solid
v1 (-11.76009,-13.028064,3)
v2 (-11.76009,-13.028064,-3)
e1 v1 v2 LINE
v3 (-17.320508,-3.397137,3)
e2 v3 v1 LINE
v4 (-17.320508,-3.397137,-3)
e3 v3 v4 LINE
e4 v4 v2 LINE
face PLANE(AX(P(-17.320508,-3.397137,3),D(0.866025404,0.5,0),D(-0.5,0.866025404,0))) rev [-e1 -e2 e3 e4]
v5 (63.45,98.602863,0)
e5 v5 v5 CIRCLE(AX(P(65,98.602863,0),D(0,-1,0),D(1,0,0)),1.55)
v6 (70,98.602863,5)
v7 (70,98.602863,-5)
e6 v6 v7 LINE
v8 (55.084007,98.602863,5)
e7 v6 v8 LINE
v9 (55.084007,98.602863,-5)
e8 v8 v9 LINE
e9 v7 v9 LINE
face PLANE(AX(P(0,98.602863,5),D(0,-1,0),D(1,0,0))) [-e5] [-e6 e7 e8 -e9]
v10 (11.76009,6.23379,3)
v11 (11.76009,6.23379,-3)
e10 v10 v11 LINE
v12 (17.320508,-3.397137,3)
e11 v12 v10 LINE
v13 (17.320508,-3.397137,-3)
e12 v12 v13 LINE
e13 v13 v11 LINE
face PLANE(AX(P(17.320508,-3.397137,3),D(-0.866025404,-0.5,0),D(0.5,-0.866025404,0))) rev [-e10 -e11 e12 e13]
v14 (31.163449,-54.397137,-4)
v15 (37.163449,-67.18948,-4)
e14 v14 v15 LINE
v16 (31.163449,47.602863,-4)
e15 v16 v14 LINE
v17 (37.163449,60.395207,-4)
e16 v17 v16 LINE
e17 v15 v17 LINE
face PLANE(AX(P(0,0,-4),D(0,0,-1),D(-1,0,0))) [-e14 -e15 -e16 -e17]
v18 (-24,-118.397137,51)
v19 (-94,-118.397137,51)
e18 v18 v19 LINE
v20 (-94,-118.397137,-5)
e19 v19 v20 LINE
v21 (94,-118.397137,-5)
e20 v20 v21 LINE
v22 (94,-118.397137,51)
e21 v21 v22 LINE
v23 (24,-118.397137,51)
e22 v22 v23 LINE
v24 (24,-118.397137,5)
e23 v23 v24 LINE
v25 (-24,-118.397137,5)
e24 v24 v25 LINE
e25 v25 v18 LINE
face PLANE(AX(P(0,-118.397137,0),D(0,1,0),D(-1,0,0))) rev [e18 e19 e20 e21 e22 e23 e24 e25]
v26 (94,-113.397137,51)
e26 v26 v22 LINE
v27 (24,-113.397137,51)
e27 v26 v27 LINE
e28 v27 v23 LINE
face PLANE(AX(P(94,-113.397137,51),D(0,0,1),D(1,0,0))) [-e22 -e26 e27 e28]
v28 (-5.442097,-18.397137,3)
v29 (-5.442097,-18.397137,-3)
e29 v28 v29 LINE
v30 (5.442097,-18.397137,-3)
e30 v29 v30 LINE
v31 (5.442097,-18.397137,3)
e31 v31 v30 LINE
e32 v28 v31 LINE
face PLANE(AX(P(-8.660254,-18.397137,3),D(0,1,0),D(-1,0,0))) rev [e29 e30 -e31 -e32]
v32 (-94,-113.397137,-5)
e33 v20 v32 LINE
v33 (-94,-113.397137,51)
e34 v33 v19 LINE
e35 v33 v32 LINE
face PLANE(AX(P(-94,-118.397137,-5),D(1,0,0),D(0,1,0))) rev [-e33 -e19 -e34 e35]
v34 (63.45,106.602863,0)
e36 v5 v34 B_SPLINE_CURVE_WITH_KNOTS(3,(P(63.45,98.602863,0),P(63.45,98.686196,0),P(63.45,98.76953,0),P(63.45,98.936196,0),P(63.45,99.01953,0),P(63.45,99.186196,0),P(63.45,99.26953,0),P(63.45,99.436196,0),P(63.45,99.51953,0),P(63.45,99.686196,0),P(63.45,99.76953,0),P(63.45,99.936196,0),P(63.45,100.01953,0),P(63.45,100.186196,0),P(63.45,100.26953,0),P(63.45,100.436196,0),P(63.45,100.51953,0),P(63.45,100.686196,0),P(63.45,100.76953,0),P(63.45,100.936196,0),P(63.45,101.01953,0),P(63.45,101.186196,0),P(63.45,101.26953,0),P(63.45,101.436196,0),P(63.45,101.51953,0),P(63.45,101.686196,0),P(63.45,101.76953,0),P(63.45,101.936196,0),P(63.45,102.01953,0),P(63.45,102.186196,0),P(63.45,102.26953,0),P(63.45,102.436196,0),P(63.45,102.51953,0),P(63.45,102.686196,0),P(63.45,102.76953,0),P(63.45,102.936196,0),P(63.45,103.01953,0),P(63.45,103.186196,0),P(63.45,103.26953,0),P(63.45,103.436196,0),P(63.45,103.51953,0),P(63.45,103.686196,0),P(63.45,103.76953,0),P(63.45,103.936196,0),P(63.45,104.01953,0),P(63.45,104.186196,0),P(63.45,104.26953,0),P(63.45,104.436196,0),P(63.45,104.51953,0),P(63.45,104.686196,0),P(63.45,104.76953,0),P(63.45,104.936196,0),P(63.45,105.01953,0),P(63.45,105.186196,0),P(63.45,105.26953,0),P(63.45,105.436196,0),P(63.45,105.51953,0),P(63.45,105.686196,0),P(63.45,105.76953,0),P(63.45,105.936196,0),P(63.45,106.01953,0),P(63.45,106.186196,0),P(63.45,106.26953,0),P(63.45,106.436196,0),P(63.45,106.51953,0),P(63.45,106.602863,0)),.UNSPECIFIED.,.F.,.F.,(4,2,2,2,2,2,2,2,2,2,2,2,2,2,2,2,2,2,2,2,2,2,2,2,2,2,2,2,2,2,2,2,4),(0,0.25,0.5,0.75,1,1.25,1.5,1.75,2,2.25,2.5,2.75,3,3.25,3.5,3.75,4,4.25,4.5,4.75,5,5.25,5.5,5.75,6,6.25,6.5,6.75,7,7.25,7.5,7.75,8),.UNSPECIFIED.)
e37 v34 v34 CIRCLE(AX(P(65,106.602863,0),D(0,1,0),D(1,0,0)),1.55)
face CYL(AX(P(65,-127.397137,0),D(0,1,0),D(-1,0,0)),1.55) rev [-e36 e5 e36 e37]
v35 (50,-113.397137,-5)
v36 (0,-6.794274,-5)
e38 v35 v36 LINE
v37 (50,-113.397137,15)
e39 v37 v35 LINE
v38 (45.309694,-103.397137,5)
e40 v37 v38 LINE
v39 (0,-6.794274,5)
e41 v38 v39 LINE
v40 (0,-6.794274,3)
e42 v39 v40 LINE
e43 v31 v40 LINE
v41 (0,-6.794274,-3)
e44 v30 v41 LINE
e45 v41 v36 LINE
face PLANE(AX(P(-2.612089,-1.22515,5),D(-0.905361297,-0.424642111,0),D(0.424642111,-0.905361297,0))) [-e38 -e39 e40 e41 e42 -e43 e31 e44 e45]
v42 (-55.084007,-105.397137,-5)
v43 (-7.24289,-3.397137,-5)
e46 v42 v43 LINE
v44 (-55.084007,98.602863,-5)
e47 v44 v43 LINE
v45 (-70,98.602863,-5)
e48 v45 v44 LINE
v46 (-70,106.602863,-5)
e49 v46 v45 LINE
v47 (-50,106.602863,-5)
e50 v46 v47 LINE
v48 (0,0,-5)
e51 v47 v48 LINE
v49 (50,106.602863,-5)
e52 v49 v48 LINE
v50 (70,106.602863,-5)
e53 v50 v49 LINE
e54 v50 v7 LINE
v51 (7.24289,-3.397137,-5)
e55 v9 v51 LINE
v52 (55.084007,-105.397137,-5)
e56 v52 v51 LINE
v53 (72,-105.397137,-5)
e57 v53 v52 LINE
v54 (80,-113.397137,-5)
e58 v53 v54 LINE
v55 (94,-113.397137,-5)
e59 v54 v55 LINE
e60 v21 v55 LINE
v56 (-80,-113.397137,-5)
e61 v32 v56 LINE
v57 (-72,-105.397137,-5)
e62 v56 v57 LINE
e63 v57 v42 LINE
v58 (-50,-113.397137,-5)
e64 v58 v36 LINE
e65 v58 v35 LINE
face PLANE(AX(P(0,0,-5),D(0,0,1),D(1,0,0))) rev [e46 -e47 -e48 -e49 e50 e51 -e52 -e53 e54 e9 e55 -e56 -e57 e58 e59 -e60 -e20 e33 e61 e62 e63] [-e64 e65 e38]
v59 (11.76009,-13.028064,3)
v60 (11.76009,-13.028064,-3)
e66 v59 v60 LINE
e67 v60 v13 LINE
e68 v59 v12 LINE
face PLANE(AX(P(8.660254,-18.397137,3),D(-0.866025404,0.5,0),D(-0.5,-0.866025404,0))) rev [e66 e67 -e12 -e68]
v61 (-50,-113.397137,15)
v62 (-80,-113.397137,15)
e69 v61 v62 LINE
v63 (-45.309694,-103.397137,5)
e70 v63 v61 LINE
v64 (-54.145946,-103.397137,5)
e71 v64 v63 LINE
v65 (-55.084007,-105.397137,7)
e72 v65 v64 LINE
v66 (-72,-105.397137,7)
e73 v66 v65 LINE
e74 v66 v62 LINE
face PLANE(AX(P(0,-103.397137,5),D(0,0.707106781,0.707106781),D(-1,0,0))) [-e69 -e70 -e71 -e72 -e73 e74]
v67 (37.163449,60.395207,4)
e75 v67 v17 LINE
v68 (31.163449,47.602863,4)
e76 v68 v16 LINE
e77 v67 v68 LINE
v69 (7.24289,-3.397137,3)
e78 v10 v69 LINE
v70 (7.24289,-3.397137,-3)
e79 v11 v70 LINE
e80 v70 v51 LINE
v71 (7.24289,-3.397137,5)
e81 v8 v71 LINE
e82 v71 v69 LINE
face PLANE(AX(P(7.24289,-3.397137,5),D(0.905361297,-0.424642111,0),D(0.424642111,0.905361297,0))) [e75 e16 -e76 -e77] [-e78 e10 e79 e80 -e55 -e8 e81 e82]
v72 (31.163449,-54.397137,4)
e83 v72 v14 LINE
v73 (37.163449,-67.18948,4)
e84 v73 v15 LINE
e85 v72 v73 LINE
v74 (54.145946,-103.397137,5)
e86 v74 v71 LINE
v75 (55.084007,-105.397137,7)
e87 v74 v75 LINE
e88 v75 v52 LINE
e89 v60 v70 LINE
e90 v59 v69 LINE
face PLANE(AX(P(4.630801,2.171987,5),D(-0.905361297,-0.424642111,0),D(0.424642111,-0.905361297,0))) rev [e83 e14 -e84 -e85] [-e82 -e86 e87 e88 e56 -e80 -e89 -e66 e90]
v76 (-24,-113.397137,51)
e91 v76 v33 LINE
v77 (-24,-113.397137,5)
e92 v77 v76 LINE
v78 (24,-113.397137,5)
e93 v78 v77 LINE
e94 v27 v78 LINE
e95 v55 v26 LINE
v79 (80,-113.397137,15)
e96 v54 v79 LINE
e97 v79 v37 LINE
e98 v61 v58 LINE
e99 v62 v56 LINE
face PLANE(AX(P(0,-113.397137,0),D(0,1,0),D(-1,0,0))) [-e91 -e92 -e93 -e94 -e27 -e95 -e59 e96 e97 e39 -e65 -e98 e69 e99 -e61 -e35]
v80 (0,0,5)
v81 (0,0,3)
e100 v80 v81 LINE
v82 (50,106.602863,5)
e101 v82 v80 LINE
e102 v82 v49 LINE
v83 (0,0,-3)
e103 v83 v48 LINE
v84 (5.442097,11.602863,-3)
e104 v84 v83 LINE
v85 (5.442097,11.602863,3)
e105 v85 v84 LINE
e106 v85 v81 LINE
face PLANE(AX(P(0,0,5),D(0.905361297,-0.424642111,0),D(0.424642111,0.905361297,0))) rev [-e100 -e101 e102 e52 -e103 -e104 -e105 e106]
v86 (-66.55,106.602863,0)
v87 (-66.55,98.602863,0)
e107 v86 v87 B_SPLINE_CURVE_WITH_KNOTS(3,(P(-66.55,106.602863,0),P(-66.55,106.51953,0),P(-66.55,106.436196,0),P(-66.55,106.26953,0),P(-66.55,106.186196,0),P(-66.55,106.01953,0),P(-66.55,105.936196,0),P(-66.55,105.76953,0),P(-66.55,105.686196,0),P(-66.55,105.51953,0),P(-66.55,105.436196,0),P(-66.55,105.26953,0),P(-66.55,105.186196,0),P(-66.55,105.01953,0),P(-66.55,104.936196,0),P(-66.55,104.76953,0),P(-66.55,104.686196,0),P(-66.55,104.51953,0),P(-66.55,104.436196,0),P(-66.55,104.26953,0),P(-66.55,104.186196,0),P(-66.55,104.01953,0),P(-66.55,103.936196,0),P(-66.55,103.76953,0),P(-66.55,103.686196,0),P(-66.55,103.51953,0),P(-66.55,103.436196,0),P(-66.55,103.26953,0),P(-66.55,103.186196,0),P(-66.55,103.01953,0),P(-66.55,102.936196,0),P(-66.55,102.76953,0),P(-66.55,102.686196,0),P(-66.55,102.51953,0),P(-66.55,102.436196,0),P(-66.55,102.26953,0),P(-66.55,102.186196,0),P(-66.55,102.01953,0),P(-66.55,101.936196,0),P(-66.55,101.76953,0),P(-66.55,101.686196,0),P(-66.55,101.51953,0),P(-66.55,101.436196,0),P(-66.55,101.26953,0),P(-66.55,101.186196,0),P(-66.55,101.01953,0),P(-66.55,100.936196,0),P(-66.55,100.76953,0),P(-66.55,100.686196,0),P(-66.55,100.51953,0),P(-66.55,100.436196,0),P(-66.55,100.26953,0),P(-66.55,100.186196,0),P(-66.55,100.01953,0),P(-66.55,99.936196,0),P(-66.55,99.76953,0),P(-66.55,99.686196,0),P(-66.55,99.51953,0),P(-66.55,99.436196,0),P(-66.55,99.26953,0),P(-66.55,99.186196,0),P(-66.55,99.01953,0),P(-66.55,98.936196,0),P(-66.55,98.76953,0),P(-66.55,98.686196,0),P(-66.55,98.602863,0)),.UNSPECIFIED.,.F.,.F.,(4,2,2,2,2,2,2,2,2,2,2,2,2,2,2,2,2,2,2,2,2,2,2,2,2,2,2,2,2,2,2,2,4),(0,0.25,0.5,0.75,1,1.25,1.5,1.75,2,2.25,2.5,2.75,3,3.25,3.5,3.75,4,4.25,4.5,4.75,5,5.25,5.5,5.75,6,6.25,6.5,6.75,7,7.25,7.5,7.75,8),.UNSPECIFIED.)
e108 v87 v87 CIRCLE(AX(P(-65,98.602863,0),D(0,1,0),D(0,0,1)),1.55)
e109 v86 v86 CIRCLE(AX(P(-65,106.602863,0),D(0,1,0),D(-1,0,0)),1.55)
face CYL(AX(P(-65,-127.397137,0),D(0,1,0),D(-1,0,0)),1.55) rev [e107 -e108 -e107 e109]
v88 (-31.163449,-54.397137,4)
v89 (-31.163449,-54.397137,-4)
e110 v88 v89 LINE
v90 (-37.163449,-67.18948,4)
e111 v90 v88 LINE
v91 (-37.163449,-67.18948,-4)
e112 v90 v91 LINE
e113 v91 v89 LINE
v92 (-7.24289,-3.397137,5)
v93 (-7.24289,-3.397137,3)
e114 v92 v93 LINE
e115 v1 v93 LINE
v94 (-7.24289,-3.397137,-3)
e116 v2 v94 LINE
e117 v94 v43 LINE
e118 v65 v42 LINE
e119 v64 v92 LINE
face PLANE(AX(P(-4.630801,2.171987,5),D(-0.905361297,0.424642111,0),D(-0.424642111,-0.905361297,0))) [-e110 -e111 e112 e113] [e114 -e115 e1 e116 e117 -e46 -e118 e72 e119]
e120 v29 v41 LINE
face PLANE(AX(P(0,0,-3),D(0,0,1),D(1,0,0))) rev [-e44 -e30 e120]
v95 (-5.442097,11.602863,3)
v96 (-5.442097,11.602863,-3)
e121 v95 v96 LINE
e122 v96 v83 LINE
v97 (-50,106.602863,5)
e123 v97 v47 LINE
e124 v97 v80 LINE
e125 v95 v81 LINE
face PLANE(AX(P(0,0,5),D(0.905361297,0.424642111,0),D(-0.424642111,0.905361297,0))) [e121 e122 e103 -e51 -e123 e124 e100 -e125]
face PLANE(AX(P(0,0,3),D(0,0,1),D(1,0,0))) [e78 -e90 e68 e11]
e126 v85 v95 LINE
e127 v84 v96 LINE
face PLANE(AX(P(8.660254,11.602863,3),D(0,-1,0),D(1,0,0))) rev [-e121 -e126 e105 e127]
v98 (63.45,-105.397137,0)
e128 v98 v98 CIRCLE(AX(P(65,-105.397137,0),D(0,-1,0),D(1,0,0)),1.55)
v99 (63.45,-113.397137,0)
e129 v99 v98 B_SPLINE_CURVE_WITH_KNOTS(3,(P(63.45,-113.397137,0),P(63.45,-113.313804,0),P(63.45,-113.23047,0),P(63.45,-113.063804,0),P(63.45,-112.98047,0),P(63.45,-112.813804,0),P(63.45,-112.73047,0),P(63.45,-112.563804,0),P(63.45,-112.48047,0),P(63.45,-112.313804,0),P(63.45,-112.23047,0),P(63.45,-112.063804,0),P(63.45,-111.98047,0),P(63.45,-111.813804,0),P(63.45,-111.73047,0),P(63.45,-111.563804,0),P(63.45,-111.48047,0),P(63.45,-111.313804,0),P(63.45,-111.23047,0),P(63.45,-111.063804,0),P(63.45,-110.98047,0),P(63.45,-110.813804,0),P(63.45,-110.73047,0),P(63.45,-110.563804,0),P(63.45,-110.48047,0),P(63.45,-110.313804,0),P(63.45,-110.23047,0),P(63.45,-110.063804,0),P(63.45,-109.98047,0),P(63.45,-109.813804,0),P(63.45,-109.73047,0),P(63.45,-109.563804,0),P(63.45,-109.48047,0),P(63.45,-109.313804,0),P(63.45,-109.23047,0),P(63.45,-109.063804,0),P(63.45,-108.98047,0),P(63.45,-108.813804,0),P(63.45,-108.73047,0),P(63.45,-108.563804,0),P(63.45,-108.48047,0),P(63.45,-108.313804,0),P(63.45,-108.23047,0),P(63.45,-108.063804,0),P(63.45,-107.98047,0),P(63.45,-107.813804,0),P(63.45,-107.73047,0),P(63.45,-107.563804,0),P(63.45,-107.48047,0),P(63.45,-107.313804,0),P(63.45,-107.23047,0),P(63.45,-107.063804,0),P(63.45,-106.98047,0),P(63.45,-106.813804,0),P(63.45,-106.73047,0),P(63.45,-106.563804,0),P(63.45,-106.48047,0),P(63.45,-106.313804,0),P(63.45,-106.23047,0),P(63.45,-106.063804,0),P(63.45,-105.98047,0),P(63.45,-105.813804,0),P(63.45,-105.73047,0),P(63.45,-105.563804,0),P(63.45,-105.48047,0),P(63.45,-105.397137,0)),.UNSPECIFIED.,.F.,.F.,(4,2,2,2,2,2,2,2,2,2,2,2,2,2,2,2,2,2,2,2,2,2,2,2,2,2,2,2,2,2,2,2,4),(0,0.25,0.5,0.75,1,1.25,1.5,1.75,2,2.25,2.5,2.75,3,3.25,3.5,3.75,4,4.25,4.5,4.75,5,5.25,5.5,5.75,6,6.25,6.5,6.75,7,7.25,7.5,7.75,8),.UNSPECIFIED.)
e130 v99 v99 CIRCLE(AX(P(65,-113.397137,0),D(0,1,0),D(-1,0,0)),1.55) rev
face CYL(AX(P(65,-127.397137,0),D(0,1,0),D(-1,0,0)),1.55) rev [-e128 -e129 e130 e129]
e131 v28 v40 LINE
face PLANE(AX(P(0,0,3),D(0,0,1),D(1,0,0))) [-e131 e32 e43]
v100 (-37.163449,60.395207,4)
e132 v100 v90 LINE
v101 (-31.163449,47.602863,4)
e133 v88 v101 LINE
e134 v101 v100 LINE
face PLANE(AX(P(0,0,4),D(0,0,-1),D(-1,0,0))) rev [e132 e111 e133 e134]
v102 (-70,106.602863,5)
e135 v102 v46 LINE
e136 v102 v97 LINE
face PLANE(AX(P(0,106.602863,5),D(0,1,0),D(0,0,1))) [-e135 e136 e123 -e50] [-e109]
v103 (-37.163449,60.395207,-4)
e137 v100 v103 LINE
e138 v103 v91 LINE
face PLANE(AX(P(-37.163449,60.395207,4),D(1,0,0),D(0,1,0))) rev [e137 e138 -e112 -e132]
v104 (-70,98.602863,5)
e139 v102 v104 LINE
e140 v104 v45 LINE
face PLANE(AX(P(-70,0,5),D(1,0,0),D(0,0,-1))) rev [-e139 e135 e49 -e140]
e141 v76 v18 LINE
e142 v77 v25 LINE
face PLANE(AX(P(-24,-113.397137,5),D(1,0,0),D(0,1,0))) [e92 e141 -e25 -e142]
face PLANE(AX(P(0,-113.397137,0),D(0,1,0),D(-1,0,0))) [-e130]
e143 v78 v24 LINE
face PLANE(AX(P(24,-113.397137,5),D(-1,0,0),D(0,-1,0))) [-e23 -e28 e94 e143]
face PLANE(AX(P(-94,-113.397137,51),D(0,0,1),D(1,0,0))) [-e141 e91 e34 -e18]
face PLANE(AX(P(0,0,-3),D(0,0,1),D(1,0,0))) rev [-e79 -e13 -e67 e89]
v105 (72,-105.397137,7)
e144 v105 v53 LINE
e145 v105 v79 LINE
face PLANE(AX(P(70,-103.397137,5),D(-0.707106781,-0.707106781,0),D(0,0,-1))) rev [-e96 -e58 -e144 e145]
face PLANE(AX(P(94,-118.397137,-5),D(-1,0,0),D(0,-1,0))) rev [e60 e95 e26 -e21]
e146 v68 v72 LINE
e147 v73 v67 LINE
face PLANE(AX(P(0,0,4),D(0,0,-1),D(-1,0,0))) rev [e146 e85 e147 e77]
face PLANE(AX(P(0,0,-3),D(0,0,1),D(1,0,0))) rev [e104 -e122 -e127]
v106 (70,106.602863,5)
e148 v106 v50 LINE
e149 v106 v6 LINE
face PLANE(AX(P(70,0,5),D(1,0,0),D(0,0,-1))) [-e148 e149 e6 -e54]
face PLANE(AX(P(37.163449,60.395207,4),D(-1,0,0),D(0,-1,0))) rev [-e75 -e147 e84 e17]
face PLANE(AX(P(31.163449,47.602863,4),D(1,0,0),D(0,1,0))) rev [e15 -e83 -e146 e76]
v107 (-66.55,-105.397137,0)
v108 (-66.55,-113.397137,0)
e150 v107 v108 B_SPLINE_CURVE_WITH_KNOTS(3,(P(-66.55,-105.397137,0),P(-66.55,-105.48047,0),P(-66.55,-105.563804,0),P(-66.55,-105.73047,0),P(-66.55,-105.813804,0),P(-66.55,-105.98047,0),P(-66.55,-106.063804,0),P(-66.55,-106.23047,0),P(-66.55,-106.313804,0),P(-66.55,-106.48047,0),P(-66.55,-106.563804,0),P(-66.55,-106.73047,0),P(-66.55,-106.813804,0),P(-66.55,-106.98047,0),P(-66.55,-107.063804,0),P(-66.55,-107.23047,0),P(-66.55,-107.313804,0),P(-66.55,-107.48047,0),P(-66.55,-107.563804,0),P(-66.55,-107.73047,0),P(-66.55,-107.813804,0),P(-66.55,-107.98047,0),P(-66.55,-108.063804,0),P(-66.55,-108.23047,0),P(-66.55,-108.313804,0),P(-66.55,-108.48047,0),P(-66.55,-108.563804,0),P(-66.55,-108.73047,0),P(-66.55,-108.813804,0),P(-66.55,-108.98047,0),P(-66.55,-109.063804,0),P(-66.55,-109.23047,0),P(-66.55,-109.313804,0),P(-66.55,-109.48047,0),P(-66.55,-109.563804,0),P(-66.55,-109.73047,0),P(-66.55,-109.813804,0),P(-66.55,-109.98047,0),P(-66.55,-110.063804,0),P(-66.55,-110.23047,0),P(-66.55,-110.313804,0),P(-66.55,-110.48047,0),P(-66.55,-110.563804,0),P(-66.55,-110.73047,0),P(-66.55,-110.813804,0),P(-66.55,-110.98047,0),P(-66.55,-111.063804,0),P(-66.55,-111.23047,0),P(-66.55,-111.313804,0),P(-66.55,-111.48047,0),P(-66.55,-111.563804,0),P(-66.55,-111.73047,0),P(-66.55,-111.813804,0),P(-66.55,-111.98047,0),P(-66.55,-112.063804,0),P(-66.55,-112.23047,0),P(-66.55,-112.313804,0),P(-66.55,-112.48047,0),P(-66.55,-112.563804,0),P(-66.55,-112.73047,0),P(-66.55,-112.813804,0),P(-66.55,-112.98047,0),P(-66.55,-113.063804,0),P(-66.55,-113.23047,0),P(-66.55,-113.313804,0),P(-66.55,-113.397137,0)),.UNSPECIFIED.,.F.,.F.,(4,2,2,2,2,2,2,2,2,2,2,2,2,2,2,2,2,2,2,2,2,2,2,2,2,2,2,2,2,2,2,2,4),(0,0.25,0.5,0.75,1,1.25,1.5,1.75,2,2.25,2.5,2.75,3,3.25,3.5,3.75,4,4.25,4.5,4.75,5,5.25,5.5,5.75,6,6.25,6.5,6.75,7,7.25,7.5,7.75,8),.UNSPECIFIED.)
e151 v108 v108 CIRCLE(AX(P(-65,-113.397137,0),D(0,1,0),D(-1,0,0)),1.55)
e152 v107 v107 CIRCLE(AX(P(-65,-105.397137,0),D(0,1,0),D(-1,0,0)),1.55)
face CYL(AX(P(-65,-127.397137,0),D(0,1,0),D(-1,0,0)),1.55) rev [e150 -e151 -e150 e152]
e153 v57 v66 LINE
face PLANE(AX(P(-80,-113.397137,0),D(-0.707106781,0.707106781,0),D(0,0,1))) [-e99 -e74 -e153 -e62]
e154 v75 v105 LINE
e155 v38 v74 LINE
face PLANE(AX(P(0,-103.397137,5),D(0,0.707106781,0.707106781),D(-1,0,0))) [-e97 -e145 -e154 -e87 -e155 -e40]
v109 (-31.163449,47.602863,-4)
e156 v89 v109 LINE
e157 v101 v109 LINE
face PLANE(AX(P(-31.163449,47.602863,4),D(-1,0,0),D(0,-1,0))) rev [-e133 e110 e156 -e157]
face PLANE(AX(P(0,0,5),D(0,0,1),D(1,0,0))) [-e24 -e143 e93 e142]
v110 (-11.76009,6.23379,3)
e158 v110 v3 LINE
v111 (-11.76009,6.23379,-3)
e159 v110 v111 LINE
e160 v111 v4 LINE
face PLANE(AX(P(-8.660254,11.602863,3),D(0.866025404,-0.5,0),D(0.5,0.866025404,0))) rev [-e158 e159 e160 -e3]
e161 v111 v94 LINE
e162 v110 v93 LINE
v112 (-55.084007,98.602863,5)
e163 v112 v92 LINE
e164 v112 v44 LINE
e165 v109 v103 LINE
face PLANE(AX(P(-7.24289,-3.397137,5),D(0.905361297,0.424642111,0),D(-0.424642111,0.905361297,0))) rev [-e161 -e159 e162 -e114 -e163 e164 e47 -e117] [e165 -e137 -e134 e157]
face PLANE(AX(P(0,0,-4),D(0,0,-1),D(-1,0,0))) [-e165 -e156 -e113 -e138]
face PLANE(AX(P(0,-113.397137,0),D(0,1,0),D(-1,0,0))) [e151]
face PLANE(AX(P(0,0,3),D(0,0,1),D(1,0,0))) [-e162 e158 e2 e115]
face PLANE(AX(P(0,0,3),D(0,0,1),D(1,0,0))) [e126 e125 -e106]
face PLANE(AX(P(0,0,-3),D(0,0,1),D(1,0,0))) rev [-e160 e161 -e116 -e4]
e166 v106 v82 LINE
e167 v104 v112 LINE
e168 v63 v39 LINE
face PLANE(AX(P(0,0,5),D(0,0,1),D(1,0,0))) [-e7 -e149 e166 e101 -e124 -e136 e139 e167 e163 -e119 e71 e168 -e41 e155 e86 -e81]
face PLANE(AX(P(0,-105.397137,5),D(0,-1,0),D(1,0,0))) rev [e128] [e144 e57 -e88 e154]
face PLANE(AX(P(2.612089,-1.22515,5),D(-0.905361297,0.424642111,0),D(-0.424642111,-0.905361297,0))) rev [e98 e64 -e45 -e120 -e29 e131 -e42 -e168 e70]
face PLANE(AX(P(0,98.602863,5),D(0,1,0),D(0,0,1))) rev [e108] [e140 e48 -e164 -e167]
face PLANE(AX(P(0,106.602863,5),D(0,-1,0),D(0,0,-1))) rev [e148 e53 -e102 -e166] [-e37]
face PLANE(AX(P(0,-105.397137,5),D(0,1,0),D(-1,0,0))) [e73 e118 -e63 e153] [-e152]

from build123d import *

# Parameters (mm, degrees)
EXTRUDE_1_DEPTH     = 5
SKETCH_2_R          = 1.55
CUT_EXTRUDE_1_DEPTH = 234
EXTRUDE_3_DEPTH     = 3
SKETCH_4_W          = 188
SKETCH_4_H          = 10
EXTRUDE_4_DEPTH     = 5
SKETCH_5_W          = 70
SKETCH_5_H          = 46
EXTRUDE_5_DEPTH     = 5
EXTRUDE_6_DEPTH     = 4
CHAMFER_1_SIZE      = 10


with BuildPart() as part:
    # 草图1 → 凸台-拉伸1 (new, symmetric)
    with BuildSketch(Plane.XY):
        Polygon((-55.084006936, 98.602863112), (-7.242890373, -3.397136888), (0, 0), (-50, 106.602863112), (-70, 106.602863112), (-70, 98.602863112), align=None)
        Polygon((70, 106.602863112), (70, 98.602863112), (55.084006936, 98.602863112), (7.242890373, -3.397136888), (0, 0), (50, 106.602863112), align=None)
        Polygon((-70, -113.397136888), (-70, -105.397136888), (-55.084006936, -105.397136888), (-7.242890373, -3.397136888), (0, -6.794273777), (-50, -113.397136888), align=None)
        Polygon((55.084006936, -105.397136888), (7.242890373, -3.397136888), (0, -6.794273777), (50, -113.397136888), (70, -113.397136888), (70, -105.397136888), align=None)
        Polygon((-7.242890373, -3.397136888), (0, 0), (7.242890373, -3.397136888), align=None)
        Polygon((-7.242890373, -3.397136888), (7.242890373, -3.397136888), (0, -6.794273777), align=None)
    extrude(amount=EXTRUDE_1_DEPTH, both=True)

    # 草图2 → 切除-拉伸1 (cut)
    with BuildSketch(Plane(origin=(0, 106.602863112, 0), x_dir=(1, 0, 0), z_dir=(0, 1, 0))):
        with Locations(Location((-65, 0, 0), (0, 0, 180))):
            Circle(SKETCH_2_R)
        with Locations(Location((65, 0, 0), (0, 0, 180))):
            Circle(SKETCH_2_R)
    extrude(amount=-CUT_EXTRUDE_1_DEPTH, mode=Mode.SUBTRACT)

    # 草图3 → 凸台-拉伸3 (add, symmetric)
    with BuildSketch(Plane.XY):
        Polygon((8.660254038, 11.602863112), (-8.660254038, 11.602863112), (-17.320508076, -3.397136888), (-8.660254038, -18.397136888), (8.660254038, -18.397136888), (17.320508076, -3.397136888), align=None)
    extrude(amount=EXTRUDE_3_DEPTH, both=True)

    # 草图4 → 凸台-拉伸4 (add)
    with BuildSketch(Plane.XZ.offset(113.397136888)):
        Rectangle(SKETCH_4_W, SKETCH_4_H)
    extrude(amount=EXTRUDE_4_DEPTH)

    # 草图5 → 凸台-拉伸5 (add)
    with BuildSketch(Plane.XZ.offset(118.397136888)):
        with Locations((59, 28)):
            Rectangle(SKETCH_5_W, SKETCH_5_H)
        with Locations((-59, 28)):
            Rectangle(SKETCH_5_W, SKETCH_5_H)
    extrude(amount=-EXTRUDE_5_DEPTH)

    # 草图6 → 凸台-拉伸6 (add, symmetric)
    with BuildSketch(Plane.XY):
        Polygon((-31.163448655, 47.602863112), (-31.163448655, -54.397136888), (-37.163448655, -67.189480462), (-37.163448655, 60.395206685), align=None)
        Polygon((37.163448655, -67.189480462), (31.163448655, -54.397136888), (31.163448655, 47.602863112), (37.163448655, 60.395206685), align=None)
    extrude(amount=EXTRUDE_6_DEPTH, both=True)

    # 倒角1
    # the kernel refuses this chamfer: 10 mm, written as the material it adds along each edge
    with BuildSketch(Plane(origin=(-70, -113.397136888, 5), x_dir=(0, -0.0274958766105877, 0.9996219169112968), z_dir=(1, 0, 0))) as chamfer_1_piece_1_section:
        Polygon((CHAMFER_1_SIZE * 0.999621916911, -CHAMFER_1_SIZE * 0.0274958766106), (-CHAMFER_1_SIZE * 0.0274958766106, -CHAMFER_1_SIZE * 0.999621916911), (0, 0), align=None)
    chamfer_1_piece_1 = extrude(amount=45.71682988, mode=Mode.PRIVATE)
    chamfer_1_piece_1 = split(chamfer_1_piece_1, bisect_by=Plane(origin=(-58.48678517, -112.652054934, 8.358509751), z_dir=(-0.9053612966848448, 0.4246421110360305, 0)), keep=Keep.TOP, mode=Mode.PRIVATE)
    chamfer_1_piece_1 = split(chamfer_1_piece_1, bisect_by=Plane(origin=(-63.672942129, -105.397136888, 8.358509751), z_dir=(0, -1, 0)), keep=Keep.TOP, mode=Mode.PRIVATE)
    add(chamfer_1_piece_1)
    with BuildSketch(Plane(origin=(-70, -113.397136888, 5), x_dir=(0, -0.0274958766105877, 0.9996219169112968), z_dir=(1, 0, 0))) as chamfer_1_piece_2_section:
        Polygon((CHAMFER_1_SIZE * 0.999621916911, -CHAMFER_1_SIZE * 0.0274958766106), (-CHAMFER_1_SIZE * 0.0274958766106, -CHAMFER_1_SIZE * 0.999621916911), (0, 0), align=None)
    chamfer_1_piece_2 = extrude(amount=45.71682988, mode=Mode.PRIVATE)
    chamfer_1_piece_2 = split(chamfer_1_piece_2, bisect_by=Plane(origin=(-49.392291056, -112.10146662, 8.457184123), z_dir=(-0.9053612966848449, 0.42464211103603033, 0)), keep=Keep.TOP, mode=Mode.PRIVATE)
    chamfer_1_piece_2 = split(chamfer_1_piece_2, bisect_by=Plane(origin=(-56.635181429, -108.704329732, 8.457184123), z_dir=(0.9053612966848448, -0.4246421110360305, 0)), keep=Keep.TOP, mode=Mode.PRIVATE)
    chamfer_1_piece_2 = split(chamfer_1_piece_2, bisect_by=Plane(origin=(-53.013736242, -105.397136888, 8.457184123), z_dir=(0, -1, 0)), keep=Keep.TOP, mode=Mode.PRIVATE)
    add(chamfer_1_piece_2)
    with BuildSketch(Plane(origin=(-70, -113.397136888, 5), x_dir=(0, -0.0274958766105877, 0.9996219169112968), z_dir=(1, 0, 0))) as chamfer_1_piece_3_section:
        Polygon((CHAMFER_1_SIZE * 0.999621916911, -CHAMFER_1_SIZE * 0.0274958766106), (-CHAMFER_1_SIZE * 0.0274958766106, -CHAMFER_1_SIZE * 0.999621916911), (0, 0), align=None)
    chamfer_1_piece_3 = extrude(amount=45.71682988, mode=Mode.PRIVATE)
    chamfer_1_piece_3 = split(chamfer_1_piece_3, bisect_by=Plane(origin=(-46.659786315, -106.275610043, 5.402318693), z_dir=(-0.9053612966848449, 0.42464211103603033, 0)), keep=Keep.TOP, mode=Mode.PRIVATE)
    chamfer_1_piece_3 = split(chamfer_1_piece_3, bisect_by=Plane(origin=(-53.902676688, -102.878473155, 5.402318693), z_dir=(0.9053612966848448, -0.4246421110360305, 0)), keep=Keep.TOP, mode=Mode.PRIVATE)
    chamfer_1_piece_3 = split(chamfer_1_piece_3, bisect_by=Plane(origin=(-50.281231501, -105.397136888, 5.402318693), z_dir=(0, 1, 0)), keep=Keep.TOP, mode=Mode.PRIVATE)
    add(chamfer_1_piece_3)
    with BuildSketch(Plane(origin=(70, -113.397136888, 5), x_dir=(0, -0.027495876610584936, 0.9996219169112968), z_dir=(-1, 0, 0))) as chamfer_1_piece_4_section:
        Polygon((CHAMFER_1_SIZE * 0.999621916911, CHAMFER_1_SIZE * 0.0274958766106), (-CHAMFER_1_SIZE * 0.0274958766106, CHAMFER_1_SIZE * 0.999621916911), (0, 0), align=None)
    chamfer_1_piece_4 = extrude(amount=45.71682988, mode=Mode.PRIVATE)
    chamfer_1_piece_4 = split(chamfer_1_piece_4, bisect_by=Plane(origin=(63.672942129, -105.397136888, 8.358509751), z_dir=(0, -1, 0)), keep=Keep.TOP, mode=Mode.PRIVATE)
    chamfer_1_piece_4 = split(chamfer_1_piece_4, bisect_by=Plane(origin=(58.48678517, -112.652054934, 8.358509751), z_dir=(0.905361296684845, 0.4246421110360303, 0)), keep=Keep.TOP, mode=Mode.PRIVATE)
    add(chamfer_1_piece_4)
    with BuildSketch(Plane(origin=(70, -113.397136888, 5), x_dir=(0, -0.027495876610584936, 0.9996219169112968), z_dir=(-1, 0, 0))) as chamfer_1_piece_5_section:
        Polygon((CHAMFER_1_SIZE * 0.999621916911, CHAMFER_1_SIZE * 0.0274958766106), (-CHAMFER_1_SIZE * 0.0274958766106, CHAMFER_1_SIZE * 0.999621916911), (0, 0), align=None)
    chamfer_1_piece_5 = extrude(amount=45.71682988, mode=Mode.PRIVATE)
    chamfer_1_piece_5 = split(chamfer_1_piece_5, bisect_by=Plane(origin=(49.392291056, -112.10146662, 8.457184123), z_dir=(0.9053612966848449, 0.4246421110360304, 0)), keep=Keep.TOP, mode=Mode.PRIVATE)
    chamfer_1_piece_5 = split(chamfer_1_piece_5, bisect_by=Plane(origin=(53.013736242, -105.397136888, 8.457184123), z_dir=(0, -1, 0)), keep=Keep.TOP, mode=Mode.PRIVATE)
    chamfer_1_piece_5 = split(chamfer_1_piece_5, bisect_by=Plane(origin=(56.635181429, -108.704329732, 8.457184123), z_dir=(-0.905361296684845, -0.4246421110360303, 0)), keep=Keep.TOP, mode=Mode.PRIVATE)
    add(chamfer_1_piece_5)
    with BuildSketch(Plane(origin=(70, -113.397136888, 5), x_dir=(0, -0.027495876610584936, 0.9996219169112968), z_dir=(-1, 0, 0))) as chamfer_1_piece_6_section:
        Polygon((CHAMFER_1_SIZE * 0.999621916911, CHAMFER_1_SIZE * 0.0274958766106), (-CHAMFER_1_SIZE * 0.0274958766106, CHAMFER_1_SIZE * 0.999621916911), (0, 0), align=None)
    chamfer_1_piece_6 = extrude(amount=45.71682988, mode=Mode.PRIVATE)
    chamfer_1_piece_6 = split(chamfer_1_piece_6, bisect_by=Plane(origin=(46.659786315, -106.275610043, 5.402318693), z_dir=(0.9053612966848449, 0.4246421110360304, 0)), keep=Keep.TOP, mode=Mode.PRIVATE)
    chamfer_1_piece_6 = split(chamfer_1_piece_6, bisect_by=Plane(origin=(50.281231501, -105.397136888, 5.402318693), z_dir=(0, 1, 0)), keep=Keep.TOP, mode=Mode.PRIVATE)
    chamfer_1_piece_6 = split(chamfer_1_piece_6, bisect_by=Plane(origin=(53.902676688, -102.878473155, 5.402318693), z_dir=(-0.905361296684845, -0.4246421110360303, 0)), keep=Keep.TOP, mode=Mode.PRIVATE)
    add(chamfer_1_piece_6)
    with BuildSketch(Plane(origin=(70, -113.397136888, 5), x_dir=(0.9996219169112964, -0.02749587661059736, 0), z_dir=(0, 0, -1))) as chamfer_1_piece_7_section:
        Polygon((CHAMFER_1_SIZE * 0.999621916911, -CHAMFER_1_SIZE * 0.0274958766106), (-CHAMFER_1_SIZE * 0.0274958766106, -CHAMFER_1_SIZE * 0.999621916911), (0, 0), align=None)
    chamfer_1_piece_7 = extrude(amount=10, mode=Mode.PRIVATE)
    chamfer_1_piece_7 = split(chamfer_1_piece_7, bisect_by=Plane(origin=(73.457184123, -105.397136888, 0), z_dir=(0, -1, 0)), keep=Keep.TOP, mode=Mode.PRIVATE)
    add(chamfer_1_piece_7)
    with BuildSketch(Plane(origin=(-70, -113.397136888, -5), x_dir=(-0.9996219169112968, -0.027495876610586317, 0), z_dir=(0, 0, 1))) as chamfer_1_piece_8_section:
        Polygon((CHAMFER_1_SIZE * 0.999621916911, -CHAMFER_1_SIZE * 0.0274958766106), (-CHAMFER_1_SIZE * 0.0274958766106, -CHAMFER_1_SIZE * 0.999621916911), (0, 0), align=None)
    chamfer_1_piece_8 = extrude(amount=10, mode=Mode.PRIVATE)
    chamfer_1_piece_8 = split(chamfer_1_piece_8, bisect_by=Plane(origin=(-73.457184123, -105.397136888, 0), z_dir=(0, -1, 0)), keep=Keep.TOP, mode=Mode.PRIVATE)
    add(chamfer_1_piece_8)
    with BuildSketch(Plane(origin=(-70, -113.397136888, -5), x_dir=(-0.9996219169112968, -0.027495876610586317, 0), z_dir=(0, 0, 1))) as chamfer_1_piece_9a_section:
        Polygon((CHAMFER_1_SIZE * 0.999621916911, -CHAMFER_1_SIZE * 0.0274958766106), (-CHAMFER_1_SIZE * 0.0274958766106, -CHAMFER_1_SIZE * 0.999621916911), (0, 0), align=None)
    chamfer_1_piece_9a = extrude(amount=35.71682988, mode=Mode.PRIVATE)
    chamfer_1_piece_9a = split(chamfer_1_piece_9a, bisect_by=Plane(origin=(-73.457184123, -105.397136888, 17.85841494), z_dir=(0, -1, 0)), keep=Keep.TOP, mode=Mode.PRIVATE)
    chamfer_1_piece_9a = split(chamfer_1_piece_9a, bisect_by=Plane(origin=(-73.457184123, -110.402898176, 5), z_dir=(0, 0, 1)), keep=Keep.TOP, mode=Mode.PRIVATE)
    with BuildSketch(Plane(origin=(-95.71682988, -113.397136888, 5), x_dir=(0, -0.027495876610586317, 0.9996219169112968), z_dir=(1, 0, 0))) as chamfer_1_piece_9b_section:
        Polygon((CHAMFER_1_SIZE * 0.999621916911, -CHAMFER_1_SIZE * 0.0274958766106), (-CHAMFER_1_SIZE * 0.0274958766106, -CHAMFER_1_SIZE * 0.999621916911), (0, 0), align=None)
    chamfer_1_piece_9b = extrude(amount=71.433659759, mode=Mode.PRIVATE)
    chamfer_1_piece_9b = split(chamfer_1_piece_9b, bisect_by=Plane(origin=(-94, -110.402898176, 8.457184123), z_dir=(1, 0, 0)), keep=Keep.TOP, mode=Mode.PRIVATE)
    chamfer_1_piece_9b = split(chamfer_1_piece_9b, bisect_by=Plane(origin=(-82, -105.397136888, 8.457184123), z_dir=(0, -1, 0)), keep=Keep.TOP, mode=Mode.PRIVATE)
    chamfer_1_piece_9b = split(chamfer_1_piece_9b, bisect_by=Plane(origin=(-70, -110.402898176, 8.457184123), z_dir=(-1, 0, 0)), keep=Keep.TOP, mode=Mode.PRIVATE)
    chamfer_1_piece_9 = chamfer_1_piece_9a & chamfer_1_piece_9b
    add(chamfer_1_piece_9)
    with BuildSketch(Plane(origin=(70, -113.397136888, 30.71682988), x_dir=(0.9996219169112968, -0.0274958766105877, 0), z_dir=(0, 0, -1))) as chamfer_1_piece_10a_section:
        Polygon((CHAMFER_1_SIZE * 0.999621916911, -CHAMFER_1_SIZE * 0.0274958766106), (-CHAMFER_1_SIZE * 0.0274958766106, -CHAMFER_1_SIZE * 0.999621916911), (0, 0), align=None)
    chamfer_1_piece_10a = extrude(amount=35.71682988, mode=Mode.PRIVATE)
    chamfer_1_piece_10a = split(chamfer_1_piece_10a, bisect_by=Plane(origin=(73.457184123, -105.397136888, 17.85841494), z_dir=(0, -1, 0)), keep=Keep.TOP, mode=Mode.PRIVATE)
    chamfer_1_piece_10a = split(chamfer_1_piece_10a, bisect_by=Plane(origin=(73.457184123, -110.402898176, 5), z_dir=(0, 0, 1)), keep=Keep.TOP, mode=Mode.PRIVATE)
    with BuildSketch(Plane(origin=(95.71682988, -113.397136888, 5), x_dir=(0, -0.027495876610586317, 0.9996219169112968), z_dir=(-1, 0, 0))) as chamfer_1_piece_10b_section:
        Polygon((CHAMFER_1_SIZE * 0.999621916911, CHAMFER_1_SIZE * 0.0274958766106), (-CHAMFER_1_SIZE * 0.0274958766106, CHAMFER_1_SIZE * 0.999621916911), (0, 0), align=None)
    chamfer_1_piece_10b = extrude(amount=71.433659759, mode=Mode.PRIVATE)
    chamfer_1_piece_10b = split(chamfer_1_piece_10b, bisect_by=Plane(origin=(94, -110.402898176, 8.457184123), z_dir=(-1, 0, 0)), keep=Keep.TOP, mode=Mode.PRIVATE)
    chamfer_1_piece_10b = split(chamfer_1_piece_10b, bisect_by=Plane(origin=(70, -110.402898176, 8.457184123), z_dir=(1, 0, 0)), keep=Keep.TOP, mode=Mode.PRIVATE)
    chamfer_1_piece_10b = split(chamfer_1_piece_10b, bisect_by=Plane(origin=(82, -105.397136888, 8.457184123), z_dir=(0, -1, 0)), keep=Keep.TOP, mode=Mode.PRIVATE)
    chamfer_1_piece_10 = chamfer_1_piece_10a & chamfer_1_piece_10b
    add(chamfer_1_piece_10)


solid = part.part
